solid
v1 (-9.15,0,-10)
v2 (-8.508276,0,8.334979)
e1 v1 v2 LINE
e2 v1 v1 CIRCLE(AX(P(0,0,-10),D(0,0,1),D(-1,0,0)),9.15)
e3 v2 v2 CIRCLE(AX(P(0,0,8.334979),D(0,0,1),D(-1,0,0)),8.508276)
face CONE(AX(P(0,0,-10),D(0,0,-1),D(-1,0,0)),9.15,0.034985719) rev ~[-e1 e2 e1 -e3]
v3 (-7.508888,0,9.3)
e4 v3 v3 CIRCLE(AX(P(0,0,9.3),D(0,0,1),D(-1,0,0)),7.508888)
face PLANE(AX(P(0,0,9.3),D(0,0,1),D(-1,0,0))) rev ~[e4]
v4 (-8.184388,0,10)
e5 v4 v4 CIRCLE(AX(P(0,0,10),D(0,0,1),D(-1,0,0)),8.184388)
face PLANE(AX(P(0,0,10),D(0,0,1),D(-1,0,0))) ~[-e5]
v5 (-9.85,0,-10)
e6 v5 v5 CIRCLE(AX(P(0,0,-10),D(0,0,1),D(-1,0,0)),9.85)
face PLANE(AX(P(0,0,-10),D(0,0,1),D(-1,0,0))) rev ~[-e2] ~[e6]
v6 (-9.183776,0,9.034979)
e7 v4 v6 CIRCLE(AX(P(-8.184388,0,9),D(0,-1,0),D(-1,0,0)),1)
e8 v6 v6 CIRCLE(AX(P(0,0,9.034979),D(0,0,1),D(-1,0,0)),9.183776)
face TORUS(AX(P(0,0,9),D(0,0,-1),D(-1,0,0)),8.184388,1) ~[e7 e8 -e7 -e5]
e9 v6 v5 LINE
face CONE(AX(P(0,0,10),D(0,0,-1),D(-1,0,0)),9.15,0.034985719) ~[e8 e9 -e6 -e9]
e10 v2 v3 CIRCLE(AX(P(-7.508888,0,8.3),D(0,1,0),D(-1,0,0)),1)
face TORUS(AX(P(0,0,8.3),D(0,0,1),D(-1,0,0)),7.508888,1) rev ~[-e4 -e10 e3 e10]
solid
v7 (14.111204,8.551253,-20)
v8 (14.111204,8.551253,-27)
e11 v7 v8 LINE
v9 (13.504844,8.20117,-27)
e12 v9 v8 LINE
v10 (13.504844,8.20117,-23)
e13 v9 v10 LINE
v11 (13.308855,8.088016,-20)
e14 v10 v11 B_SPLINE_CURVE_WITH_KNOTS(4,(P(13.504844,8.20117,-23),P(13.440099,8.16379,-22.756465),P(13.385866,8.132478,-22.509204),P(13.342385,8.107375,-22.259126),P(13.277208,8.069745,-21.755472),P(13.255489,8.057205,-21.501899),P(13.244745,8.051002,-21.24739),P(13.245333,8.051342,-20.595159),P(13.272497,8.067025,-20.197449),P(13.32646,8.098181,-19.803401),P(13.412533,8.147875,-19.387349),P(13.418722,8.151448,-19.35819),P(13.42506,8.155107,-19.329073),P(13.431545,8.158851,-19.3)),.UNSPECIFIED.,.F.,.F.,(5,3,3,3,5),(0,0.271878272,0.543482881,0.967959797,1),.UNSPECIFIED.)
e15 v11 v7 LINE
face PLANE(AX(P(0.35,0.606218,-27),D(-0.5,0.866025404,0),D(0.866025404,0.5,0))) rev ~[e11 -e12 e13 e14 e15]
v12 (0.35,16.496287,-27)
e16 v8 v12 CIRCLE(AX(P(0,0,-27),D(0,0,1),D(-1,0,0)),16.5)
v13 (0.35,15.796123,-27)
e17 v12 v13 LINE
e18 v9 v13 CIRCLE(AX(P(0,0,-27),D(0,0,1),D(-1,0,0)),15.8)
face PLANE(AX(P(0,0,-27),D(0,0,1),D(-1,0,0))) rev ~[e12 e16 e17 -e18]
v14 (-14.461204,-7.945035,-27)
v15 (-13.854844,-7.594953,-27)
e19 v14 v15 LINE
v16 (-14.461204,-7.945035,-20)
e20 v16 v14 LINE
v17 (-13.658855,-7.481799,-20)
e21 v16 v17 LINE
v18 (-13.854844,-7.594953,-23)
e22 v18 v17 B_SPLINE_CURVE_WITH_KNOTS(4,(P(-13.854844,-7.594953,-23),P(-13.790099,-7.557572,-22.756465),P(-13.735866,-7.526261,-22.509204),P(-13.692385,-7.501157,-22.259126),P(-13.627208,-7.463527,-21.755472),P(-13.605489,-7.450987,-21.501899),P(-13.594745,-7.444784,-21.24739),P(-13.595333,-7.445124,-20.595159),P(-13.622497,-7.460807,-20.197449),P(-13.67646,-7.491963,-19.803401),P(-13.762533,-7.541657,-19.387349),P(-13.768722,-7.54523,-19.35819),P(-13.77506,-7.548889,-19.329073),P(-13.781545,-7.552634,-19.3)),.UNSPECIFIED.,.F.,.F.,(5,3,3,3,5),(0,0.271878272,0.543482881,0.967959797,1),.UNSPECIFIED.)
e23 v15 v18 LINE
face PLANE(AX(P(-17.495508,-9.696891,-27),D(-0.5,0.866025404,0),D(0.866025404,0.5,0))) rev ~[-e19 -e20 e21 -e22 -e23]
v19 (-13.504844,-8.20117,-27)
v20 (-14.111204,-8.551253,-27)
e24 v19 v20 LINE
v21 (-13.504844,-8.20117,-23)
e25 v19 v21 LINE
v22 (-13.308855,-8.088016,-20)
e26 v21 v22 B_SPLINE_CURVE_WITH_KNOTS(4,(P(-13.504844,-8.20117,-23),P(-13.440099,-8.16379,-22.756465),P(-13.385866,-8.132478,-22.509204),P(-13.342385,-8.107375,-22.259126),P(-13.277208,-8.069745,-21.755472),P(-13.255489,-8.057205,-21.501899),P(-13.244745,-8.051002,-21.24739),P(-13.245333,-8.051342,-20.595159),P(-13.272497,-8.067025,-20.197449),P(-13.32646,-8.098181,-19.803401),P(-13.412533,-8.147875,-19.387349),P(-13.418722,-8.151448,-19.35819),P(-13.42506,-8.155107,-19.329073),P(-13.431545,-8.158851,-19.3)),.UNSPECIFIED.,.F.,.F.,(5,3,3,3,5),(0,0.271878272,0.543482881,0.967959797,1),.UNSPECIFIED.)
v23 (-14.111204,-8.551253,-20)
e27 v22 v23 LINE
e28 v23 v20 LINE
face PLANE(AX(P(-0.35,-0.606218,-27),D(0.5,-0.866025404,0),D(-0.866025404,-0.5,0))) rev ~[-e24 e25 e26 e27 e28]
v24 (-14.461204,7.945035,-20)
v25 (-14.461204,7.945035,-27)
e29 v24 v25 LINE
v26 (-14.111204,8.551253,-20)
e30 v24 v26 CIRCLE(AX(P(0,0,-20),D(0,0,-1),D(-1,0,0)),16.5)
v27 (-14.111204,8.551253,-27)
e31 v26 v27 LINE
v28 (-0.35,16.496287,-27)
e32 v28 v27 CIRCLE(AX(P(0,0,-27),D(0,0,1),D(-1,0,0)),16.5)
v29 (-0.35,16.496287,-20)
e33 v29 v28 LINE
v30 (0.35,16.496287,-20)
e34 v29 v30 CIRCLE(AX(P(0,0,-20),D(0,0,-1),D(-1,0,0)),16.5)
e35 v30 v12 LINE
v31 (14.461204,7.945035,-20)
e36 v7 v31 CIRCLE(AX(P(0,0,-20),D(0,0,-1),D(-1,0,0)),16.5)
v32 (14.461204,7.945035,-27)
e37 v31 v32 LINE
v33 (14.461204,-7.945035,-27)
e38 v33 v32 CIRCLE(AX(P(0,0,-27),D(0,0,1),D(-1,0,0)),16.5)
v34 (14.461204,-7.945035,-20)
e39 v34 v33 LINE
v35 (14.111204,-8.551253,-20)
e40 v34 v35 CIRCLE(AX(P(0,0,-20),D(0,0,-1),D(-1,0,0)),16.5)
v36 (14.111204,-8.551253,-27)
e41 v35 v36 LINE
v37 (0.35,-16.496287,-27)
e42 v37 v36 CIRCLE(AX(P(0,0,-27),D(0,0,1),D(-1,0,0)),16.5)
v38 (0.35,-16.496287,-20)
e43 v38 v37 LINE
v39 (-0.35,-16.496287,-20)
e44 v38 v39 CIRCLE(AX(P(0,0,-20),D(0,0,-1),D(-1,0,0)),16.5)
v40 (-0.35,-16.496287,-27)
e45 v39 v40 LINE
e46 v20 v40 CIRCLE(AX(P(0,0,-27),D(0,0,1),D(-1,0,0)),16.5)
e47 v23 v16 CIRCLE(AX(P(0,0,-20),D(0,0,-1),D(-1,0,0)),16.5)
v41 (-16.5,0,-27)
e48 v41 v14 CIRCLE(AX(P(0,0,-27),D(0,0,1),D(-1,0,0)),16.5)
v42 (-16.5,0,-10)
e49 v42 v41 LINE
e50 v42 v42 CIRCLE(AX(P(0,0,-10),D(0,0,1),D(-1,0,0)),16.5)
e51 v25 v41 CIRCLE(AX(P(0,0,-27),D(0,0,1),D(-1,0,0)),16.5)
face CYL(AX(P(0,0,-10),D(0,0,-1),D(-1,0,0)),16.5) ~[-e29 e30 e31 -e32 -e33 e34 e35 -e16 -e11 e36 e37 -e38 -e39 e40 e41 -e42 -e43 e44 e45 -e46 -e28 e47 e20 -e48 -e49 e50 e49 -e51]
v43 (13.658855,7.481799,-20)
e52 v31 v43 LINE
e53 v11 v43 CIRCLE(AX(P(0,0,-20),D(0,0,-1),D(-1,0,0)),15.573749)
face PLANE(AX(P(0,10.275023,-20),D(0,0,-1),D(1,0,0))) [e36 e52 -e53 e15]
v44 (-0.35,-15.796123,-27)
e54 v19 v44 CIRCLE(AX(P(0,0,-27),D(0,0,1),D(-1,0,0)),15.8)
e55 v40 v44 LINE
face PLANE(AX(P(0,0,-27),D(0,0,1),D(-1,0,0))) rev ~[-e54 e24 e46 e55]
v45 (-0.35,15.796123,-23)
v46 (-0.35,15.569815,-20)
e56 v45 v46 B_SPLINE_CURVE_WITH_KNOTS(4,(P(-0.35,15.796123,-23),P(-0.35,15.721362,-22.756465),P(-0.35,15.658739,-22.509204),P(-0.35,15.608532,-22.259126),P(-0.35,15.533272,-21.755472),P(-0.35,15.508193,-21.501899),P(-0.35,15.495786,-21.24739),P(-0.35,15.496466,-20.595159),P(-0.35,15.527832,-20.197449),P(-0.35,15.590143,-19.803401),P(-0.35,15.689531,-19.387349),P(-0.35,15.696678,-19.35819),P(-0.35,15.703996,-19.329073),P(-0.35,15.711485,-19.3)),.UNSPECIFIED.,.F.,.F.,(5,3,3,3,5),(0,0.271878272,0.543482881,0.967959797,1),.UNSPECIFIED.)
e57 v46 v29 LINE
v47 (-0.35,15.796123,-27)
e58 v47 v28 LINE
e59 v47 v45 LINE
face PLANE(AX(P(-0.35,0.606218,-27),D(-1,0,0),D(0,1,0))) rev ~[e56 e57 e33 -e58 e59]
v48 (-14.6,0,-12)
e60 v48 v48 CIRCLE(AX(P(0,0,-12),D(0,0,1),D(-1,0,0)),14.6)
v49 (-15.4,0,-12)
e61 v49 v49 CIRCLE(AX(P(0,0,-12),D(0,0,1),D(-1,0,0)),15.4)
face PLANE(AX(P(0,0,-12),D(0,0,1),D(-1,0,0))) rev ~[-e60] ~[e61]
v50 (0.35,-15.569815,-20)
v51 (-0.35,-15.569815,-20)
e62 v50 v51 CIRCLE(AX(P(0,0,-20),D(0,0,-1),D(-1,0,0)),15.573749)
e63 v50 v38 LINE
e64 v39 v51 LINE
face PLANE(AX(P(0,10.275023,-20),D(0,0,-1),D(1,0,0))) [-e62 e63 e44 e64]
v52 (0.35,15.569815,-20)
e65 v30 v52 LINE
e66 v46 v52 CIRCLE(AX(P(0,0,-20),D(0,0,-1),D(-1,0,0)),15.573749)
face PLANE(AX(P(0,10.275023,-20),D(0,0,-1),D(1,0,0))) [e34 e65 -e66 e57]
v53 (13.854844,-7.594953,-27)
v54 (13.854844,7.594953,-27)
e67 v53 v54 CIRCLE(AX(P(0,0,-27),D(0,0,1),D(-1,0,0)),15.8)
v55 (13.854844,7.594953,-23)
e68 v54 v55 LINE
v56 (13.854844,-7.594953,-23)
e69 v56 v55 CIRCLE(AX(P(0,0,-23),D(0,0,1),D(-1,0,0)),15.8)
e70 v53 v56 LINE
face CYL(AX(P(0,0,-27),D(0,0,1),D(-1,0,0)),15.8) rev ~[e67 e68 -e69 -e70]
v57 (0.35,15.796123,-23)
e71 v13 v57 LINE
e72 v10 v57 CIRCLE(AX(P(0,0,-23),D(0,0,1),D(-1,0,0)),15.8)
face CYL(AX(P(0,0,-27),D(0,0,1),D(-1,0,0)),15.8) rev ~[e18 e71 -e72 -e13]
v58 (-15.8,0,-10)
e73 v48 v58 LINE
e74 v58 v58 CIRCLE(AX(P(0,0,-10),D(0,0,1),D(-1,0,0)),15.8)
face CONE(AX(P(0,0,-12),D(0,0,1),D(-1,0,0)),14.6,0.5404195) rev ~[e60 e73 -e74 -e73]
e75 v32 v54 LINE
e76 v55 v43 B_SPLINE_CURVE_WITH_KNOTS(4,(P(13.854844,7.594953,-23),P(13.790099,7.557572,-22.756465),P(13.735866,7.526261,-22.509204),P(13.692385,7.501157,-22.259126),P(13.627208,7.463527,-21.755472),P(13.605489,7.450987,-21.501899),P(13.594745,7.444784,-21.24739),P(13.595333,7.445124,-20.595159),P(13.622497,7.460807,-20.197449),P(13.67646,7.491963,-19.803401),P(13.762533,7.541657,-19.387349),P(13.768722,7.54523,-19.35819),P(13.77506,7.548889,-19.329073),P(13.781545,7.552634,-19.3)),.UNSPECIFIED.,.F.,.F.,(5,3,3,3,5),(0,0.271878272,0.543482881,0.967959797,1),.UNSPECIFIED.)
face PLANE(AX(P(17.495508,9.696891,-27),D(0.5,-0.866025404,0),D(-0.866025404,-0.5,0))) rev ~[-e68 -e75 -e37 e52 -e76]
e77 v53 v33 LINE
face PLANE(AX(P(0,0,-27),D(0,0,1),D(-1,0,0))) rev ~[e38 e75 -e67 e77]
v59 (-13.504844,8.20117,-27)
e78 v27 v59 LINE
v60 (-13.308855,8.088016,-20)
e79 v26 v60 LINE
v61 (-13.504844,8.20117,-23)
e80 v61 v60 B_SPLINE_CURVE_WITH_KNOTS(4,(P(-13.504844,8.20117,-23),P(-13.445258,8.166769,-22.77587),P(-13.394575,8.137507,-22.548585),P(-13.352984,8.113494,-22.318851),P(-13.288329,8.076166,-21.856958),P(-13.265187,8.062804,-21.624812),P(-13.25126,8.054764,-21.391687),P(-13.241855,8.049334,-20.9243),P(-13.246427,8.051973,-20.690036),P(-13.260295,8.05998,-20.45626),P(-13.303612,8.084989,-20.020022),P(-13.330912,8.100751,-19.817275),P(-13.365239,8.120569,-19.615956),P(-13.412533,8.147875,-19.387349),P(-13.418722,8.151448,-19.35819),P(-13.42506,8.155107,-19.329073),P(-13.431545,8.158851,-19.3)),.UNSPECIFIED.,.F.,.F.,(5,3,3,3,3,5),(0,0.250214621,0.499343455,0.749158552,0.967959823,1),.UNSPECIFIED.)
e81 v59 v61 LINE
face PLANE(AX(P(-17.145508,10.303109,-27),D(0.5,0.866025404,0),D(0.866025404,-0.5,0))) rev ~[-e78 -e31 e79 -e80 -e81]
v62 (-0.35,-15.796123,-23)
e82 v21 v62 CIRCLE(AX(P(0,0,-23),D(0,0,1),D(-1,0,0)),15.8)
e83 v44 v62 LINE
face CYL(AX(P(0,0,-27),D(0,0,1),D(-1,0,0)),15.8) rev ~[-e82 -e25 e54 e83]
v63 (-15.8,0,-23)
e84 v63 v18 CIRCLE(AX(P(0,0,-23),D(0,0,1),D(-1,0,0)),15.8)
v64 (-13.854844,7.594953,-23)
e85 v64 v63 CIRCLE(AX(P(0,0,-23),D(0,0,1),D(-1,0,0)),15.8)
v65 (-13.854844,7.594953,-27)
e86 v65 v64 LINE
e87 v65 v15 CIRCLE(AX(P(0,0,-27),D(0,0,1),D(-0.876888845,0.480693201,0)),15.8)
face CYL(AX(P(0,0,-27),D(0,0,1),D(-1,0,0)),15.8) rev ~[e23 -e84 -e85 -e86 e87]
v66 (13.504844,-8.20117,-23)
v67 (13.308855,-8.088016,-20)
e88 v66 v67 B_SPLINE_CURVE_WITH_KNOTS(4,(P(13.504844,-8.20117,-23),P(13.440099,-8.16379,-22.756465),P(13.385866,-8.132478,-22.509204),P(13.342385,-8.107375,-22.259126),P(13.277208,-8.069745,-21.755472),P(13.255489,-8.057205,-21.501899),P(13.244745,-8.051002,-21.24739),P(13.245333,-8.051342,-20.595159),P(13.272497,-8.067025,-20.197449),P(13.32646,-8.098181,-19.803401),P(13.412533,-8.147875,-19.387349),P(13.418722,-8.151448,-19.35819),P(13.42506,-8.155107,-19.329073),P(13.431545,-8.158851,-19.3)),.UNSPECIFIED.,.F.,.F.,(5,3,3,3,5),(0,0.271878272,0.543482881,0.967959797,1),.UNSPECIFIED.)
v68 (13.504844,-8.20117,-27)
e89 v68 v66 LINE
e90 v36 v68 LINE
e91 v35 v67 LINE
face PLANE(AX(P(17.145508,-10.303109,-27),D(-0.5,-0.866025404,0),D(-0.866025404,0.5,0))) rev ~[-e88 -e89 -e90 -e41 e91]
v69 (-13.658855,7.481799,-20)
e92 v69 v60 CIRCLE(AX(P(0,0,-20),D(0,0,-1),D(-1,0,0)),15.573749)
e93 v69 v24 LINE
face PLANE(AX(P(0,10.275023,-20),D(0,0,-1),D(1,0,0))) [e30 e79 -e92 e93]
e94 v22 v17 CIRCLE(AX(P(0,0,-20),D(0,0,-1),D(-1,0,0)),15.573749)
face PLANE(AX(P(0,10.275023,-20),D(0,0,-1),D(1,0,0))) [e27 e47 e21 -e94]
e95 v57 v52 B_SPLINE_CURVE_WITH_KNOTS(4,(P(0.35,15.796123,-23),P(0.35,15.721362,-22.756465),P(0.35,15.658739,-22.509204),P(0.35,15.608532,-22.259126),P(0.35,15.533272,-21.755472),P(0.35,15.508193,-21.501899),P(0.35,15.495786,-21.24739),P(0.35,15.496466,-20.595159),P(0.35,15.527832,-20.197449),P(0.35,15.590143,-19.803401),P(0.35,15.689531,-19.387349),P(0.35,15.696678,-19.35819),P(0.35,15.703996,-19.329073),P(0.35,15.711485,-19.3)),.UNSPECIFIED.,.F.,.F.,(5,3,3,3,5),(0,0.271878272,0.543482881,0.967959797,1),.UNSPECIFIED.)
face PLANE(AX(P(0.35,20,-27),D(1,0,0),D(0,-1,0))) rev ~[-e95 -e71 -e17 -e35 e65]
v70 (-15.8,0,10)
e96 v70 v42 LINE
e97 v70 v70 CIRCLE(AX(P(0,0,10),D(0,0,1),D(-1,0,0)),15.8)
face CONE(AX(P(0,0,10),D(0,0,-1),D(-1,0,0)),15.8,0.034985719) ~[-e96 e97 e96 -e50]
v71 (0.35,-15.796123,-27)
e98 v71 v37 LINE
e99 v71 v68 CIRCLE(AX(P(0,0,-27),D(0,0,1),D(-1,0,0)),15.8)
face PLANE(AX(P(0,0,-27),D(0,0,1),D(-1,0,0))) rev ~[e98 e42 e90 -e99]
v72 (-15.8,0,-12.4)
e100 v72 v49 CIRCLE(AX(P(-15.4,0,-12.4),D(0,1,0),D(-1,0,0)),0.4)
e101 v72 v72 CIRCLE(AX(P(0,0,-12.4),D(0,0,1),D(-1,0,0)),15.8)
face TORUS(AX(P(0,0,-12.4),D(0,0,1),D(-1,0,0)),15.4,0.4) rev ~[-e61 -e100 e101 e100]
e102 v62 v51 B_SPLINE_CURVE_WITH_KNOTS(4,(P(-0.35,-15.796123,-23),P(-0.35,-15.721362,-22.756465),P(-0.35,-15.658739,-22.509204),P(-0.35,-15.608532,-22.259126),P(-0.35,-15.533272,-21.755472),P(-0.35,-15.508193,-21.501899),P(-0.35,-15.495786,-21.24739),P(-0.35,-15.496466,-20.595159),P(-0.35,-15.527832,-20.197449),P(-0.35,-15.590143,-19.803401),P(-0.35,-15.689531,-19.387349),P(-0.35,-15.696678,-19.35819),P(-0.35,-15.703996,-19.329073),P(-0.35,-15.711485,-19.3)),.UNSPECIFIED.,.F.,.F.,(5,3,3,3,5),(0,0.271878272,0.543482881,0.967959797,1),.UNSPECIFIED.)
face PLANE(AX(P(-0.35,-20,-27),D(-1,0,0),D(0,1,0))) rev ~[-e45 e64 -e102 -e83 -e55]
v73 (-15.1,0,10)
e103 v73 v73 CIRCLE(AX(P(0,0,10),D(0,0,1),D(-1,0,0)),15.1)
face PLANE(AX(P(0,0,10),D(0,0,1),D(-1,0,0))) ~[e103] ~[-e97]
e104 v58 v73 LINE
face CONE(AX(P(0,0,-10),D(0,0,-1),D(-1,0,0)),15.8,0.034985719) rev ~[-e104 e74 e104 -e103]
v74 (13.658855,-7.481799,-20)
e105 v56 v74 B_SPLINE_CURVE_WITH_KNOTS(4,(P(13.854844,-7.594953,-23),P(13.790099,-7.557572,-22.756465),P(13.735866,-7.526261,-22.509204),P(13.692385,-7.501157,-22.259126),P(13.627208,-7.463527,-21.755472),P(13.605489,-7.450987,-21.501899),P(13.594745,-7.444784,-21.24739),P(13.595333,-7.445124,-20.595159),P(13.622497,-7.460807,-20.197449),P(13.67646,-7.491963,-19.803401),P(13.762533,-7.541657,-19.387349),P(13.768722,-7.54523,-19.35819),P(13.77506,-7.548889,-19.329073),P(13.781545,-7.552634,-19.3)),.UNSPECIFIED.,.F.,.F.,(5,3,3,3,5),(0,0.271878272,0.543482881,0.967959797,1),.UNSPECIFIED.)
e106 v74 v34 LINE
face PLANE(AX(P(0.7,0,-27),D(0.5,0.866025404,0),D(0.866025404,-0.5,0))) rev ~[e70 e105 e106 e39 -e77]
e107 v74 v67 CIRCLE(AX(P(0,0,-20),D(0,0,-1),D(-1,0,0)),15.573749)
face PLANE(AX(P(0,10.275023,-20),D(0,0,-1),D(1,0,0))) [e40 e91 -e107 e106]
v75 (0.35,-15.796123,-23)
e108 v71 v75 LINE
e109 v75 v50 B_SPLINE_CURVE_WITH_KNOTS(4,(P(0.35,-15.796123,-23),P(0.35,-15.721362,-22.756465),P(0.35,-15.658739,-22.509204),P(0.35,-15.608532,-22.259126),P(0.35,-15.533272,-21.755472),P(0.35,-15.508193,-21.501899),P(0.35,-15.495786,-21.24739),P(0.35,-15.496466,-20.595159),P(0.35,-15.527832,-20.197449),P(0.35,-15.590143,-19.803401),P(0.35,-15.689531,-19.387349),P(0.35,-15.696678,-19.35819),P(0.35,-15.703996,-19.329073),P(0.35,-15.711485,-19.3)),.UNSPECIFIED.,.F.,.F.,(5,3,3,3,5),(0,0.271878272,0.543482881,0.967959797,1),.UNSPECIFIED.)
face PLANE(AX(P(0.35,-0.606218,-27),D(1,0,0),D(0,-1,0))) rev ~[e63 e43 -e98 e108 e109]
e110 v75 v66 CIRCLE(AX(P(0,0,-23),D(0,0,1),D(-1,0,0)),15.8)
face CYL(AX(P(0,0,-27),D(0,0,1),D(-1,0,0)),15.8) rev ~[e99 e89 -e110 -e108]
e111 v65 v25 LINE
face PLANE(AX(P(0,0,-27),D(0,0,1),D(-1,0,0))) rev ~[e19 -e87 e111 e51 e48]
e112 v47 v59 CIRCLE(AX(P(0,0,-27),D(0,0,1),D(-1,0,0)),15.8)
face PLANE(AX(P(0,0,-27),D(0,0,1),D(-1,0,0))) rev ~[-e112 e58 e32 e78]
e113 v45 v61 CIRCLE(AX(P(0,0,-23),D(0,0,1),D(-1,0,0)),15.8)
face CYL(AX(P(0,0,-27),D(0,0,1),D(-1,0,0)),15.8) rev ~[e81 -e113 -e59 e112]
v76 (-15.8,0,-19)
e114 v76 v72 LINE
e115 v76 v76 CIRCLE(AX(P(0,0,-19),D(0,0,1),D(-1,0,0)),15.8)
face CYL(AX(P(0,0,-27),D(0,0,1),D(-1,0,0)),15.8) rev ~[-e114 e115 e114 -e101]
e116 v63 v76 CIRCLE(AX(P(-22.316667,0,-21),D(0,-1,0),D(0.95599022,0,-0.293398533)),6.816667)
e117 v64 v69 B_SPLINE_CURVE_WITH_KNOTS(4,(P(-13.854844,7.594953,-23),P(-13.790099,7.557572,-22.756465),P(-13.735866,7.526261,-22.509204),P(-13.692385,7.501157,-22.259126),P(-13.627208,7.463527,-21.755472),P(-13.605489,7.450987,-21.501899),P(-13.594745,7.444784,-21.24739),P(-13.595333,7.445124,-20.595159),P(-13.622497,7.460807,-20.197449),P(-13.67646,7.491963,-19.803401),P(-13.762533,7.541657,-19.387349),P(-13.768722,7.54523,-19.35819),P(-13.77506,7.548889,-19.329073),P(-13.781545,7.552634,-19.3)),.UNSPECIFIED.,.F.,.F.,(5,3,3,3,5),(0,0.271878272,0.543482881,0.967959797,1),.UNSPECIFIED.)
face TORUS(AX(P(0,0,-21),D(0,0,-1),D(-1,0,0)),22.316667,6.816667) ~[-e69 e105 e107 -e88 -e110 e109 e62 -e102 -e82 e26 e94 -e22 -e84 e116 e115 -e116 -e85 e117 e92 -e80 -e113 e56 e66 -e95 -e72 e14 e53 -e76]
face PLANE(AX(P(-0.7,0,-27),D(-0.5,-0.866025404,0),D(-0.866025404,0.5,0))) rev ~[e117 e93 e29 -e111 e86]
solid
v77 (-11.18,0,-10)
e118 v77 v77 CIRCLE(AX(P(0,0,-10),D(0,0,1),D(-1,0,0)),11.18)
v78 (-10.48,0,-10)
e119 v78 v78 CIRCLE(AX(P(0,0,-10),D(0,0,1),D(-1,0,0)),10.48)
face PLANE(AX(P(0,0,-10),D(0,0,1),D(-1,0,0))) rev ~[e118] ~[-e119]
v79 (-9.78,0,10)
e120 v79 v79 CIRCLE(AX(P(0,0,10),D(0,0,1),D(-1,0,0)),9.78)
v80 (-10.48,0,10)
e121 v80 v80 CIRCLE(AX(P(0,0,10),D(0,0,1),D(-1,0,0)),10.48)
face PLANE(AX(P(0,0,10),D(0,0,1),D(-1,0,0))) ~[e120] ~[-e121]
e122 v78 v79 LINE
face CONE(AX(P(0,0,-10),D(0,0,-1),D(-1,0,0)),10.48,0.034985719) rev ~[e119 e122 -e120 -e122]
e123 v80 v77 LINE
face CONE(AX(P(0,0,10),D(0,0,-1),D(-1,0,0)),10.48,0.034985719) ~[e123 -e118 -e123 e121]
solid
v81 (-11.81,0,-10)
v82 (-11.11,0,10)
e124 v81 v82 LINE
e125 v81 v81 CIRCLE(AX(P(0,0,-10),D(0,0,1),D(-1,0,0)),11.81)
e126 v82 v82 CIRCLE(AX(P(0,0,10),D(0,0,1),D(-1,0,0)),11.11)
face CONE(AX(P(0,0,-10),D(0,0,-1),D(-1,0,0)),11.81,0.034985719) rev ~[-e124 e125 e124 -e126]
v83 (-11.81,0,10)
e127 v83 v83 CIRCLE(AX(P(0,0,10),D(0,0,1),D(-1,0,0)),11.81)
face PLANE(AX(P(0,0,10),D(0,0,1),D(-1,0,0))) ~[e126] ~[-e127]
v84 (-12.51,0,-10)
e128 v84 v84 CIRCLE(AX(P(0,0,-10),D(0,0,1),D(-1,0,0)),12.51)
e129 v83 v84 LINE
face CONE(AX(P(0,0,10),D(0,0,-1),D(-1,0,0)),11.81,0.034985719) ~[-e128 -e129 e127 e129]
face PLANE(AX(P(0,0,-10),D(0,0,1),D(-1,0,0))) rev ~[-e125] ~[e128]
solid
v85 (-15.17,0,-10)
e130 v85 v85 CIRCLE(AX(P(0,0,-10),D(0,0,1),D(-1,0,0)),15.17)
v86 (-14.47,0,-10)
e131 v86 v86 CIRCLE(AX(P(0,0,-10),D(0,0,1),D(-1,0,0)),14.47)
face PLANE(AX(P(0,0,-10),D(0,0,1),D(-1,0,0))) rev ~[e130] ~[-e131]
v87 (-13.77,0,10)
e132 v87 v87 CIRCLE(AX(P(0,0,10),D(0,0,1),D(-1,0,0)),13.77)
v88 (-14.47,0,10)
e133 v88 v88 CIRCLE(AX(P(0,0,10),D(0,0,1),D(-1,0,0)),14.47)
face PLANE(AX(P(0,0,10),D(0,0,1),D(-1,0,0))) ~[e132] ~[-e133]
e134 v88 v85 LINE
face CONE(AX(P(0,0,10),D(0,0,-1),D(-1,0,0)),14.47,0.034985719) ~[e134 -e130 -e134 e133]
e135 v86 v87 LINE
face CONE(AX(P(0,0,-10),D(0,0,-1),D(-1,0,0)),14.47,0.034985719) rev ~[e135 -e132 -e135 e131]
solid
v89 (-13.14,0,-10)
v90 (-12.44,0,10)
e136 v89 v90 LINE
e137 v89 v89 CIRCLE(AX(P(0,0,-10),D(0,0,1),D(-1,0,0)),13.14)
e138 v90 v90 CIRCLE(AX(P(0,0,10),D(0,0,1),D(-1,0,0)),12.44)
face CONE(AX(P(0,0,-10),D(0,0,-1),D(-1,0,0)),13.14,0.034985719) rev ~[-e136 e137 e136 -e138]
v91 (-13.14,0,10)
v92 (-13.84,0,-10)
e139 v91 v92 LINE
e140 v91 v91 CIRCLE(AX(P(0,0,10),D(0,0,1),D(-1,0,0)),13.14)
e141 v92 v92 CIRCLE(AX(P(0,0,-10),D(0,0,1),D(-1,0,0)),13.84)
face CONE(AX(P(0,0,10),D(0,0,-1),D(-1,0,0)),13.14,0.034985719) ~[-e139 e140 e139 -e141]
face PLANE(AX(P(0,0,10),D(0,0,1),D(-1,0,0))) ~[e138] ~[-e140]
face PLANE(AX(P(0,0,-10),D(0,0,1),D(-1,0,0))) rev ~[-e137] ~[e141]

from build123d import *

# Parameters (mm, degrees)
F2_R     = 1
F4_DEPTH = 7


# Not quite as in the source:
# - a feature names something its author has since deleted; it is built from what else it names


with BuildPart() as f1:
    # F0 (on Front) → F1 (revolve)
    with BuildSketch(Plane.XZ):
        Polygon((-15.1, 10), (-15.8, 10), (-16.5, -10), (-15.8, -10), align=None)
        with BuildLine():
            Line((-15.8, -19), (-15.8, -23))
            ThreePointArc((-15.8, -23), (-15.5, -21), (-15.8, -19))
        make_face()
        with BuildLine():
            Line((-15.8, -10), (-16.5, -10))
            Line((-16.5, -10), (-16.5, -27))
            Line((-16.5, -27), (-15.8, -27))
            Line((-15.8, -27), (-15.8, -23))
            Line((-15.8, -23), (-15.8, -19))
            Line((-15.8, -19), (-15.8, -12.4))
            ThreePointArc((-15.8, -12.4), (-15.6828427125, -12.1171572875), (-15.4, -12))
            Line((-15.4, -12), (-14.6, -12))
            Line((-14.6, -12), (-15.8, -10))
        make_face()
    revolve(axis=Axis((0, 0, 4.5990636138), (0, 0, 1)))

    # F3 (on face) → F4 (cut)
    with BuildSketch(Plane(origin=(0, 0, -27), x_dir=(1, 0, 0), z_dir=(0, 0, -1))):
        Polygon((-0.35, -20), (0.35, -20), (0.35, -0.6062177826), (0, -0.4041451884), (-0.35, -0.6062177826), align=None)
        Polygon((0, -0.4041451884), (0.35, -0.6062177826), (0.35, -0.2020725942), align=None)
        Polygon((0.35, -0.2020725942), (0.35, -0.6062177826), (17.1455080757, -10.3031088913), (17.4955080757, -9.6968911087), (0.7, 0), align=None)
        Polygon((-17.1455080757, -10.3031088913), (-0.35, -0.6062177826), (-0.35, -0.2020725942), (-0.7, 0), (-17.4955080757, -9.6968911087), align=None)
        Polygon((-0.35, -0.2020725942), (-0.35, -0.6062177826), (0, -0.4041451884), align=None)
        Polygon((0.35, 0.2020725942), (0.35, -0.2020725942), (0.7, 0), align=None)
        Polygon((-0.7, 0), (-0.35, -0.2020725942), (-0.35, 0.2020725942), align=None)
        Polygon((0, 0.4041451884), (0.35, 0.2020725942), (0.35, 0.6062177826), align=None)
        Polygon((0.35, 0.6062177826), (0.35, 0.2020725942), (0.7, 0), (17.4955080757, 9.6968911087), (17.1455080757, 10.3031088913), align=None)
        Polygon((-0.7, 0), (-0.35, 0.2020725942), (-0.35, 0.6062177826), (-17.1455080757, 10.3031088913), (-17.4955080757, 9.6968911087), align=None)
        Polygon((-0.35, 0.6062177826), (-0.35, 0.2020725942), (0, 0.4041451884), align=None)
        Polygon((0, 0.4041451884), (0.35, 0.6062177826), (0.35, 20), (-0.35, 20), (-0.35, 0.6062177826), align=None)
    extrude(amount=-F4_DEPTH, mode=Mode.SUBTRACT)


with BuildPart() as f1b:
    # F0 (on Front) → F1, piece 2 (revolve)
    with BuildSketch(Plane.XZ):
        Polygon((-13.77, 10), (-14.47, 10), (-15.17, -10), (-14.47, -10), align=None)
    revolve(axis=Axis((0, 0, 4.5990636138), (0, 0, 1)))


with BuildPart() as f1c:
    # F0 (on Front) → F1, piece 3 (revolve)
    with BuildSketch(Plane.XZ):
        Polygon((-12.44, 10), (-13.14, 10), (-13.84, -10), (-13.14, -10), align=None)
    revolve(axis=Axis((0, 0, 4.5990636138), (0, 0, 1)))


with BuildPart() as f1d:
    # F0 (on Front) → F1, piece 4 (revolve)
    with BuildSketch(Plane.XZ):
        Polygon((-11.11, 10), (-11.81, 10), (-12.51, -10), (-11.81, -10), align=None)
    revolve(axis=Axis((0, 0, 4.5990636138), (0, 0, 1)))


with BuildPart() as f1e:
    # F0 (on Front) → F1, piece 5 (revolve)
    with BuildSketch(Plane.XZ):
        Polygon((-10.48, -10), (-9.78, 10), (-9.85, 10), (-10.48, 10), (-11.18, -10), align=None)
    revolve(axis=Axis((0, 0, 4.5990636138), (0, 0, 1)))


with BuildPart() as f1f:
    # F0 (on Front) → F1, piece 6 (revolve)
    with BuildSketch(Plane.XZ):
        Polygon((-9.1745, 9.3), (-9.85, -10), (-9.15, -10), (-8.4745, 9.3), align=None)
        Polygon((-9.15, 10), (-9.1745, 9.3), (-8.4745, 9.3), (-8.45, 10), align=None)
        Polygon((-8.45, 10), (-8.4745, 9.3), (0, 9.3), (0, 10), align=None)
    revolve(axis=Axis((0, 0, 4.5990636138), (0, 0, 1)))

    # F2
    f2_edges = [f1f.edges().sort_by_distance(p)[0] for p in [
        (9.15, 0, 10),
        (8.4745, 0, 9.3),
    ]]
    fillet(f2_edges, radius=F2_R)


solid = Compound([f1.part, f1b.part, f1c.part, f1d.part, f1e.part, f1f.part])
